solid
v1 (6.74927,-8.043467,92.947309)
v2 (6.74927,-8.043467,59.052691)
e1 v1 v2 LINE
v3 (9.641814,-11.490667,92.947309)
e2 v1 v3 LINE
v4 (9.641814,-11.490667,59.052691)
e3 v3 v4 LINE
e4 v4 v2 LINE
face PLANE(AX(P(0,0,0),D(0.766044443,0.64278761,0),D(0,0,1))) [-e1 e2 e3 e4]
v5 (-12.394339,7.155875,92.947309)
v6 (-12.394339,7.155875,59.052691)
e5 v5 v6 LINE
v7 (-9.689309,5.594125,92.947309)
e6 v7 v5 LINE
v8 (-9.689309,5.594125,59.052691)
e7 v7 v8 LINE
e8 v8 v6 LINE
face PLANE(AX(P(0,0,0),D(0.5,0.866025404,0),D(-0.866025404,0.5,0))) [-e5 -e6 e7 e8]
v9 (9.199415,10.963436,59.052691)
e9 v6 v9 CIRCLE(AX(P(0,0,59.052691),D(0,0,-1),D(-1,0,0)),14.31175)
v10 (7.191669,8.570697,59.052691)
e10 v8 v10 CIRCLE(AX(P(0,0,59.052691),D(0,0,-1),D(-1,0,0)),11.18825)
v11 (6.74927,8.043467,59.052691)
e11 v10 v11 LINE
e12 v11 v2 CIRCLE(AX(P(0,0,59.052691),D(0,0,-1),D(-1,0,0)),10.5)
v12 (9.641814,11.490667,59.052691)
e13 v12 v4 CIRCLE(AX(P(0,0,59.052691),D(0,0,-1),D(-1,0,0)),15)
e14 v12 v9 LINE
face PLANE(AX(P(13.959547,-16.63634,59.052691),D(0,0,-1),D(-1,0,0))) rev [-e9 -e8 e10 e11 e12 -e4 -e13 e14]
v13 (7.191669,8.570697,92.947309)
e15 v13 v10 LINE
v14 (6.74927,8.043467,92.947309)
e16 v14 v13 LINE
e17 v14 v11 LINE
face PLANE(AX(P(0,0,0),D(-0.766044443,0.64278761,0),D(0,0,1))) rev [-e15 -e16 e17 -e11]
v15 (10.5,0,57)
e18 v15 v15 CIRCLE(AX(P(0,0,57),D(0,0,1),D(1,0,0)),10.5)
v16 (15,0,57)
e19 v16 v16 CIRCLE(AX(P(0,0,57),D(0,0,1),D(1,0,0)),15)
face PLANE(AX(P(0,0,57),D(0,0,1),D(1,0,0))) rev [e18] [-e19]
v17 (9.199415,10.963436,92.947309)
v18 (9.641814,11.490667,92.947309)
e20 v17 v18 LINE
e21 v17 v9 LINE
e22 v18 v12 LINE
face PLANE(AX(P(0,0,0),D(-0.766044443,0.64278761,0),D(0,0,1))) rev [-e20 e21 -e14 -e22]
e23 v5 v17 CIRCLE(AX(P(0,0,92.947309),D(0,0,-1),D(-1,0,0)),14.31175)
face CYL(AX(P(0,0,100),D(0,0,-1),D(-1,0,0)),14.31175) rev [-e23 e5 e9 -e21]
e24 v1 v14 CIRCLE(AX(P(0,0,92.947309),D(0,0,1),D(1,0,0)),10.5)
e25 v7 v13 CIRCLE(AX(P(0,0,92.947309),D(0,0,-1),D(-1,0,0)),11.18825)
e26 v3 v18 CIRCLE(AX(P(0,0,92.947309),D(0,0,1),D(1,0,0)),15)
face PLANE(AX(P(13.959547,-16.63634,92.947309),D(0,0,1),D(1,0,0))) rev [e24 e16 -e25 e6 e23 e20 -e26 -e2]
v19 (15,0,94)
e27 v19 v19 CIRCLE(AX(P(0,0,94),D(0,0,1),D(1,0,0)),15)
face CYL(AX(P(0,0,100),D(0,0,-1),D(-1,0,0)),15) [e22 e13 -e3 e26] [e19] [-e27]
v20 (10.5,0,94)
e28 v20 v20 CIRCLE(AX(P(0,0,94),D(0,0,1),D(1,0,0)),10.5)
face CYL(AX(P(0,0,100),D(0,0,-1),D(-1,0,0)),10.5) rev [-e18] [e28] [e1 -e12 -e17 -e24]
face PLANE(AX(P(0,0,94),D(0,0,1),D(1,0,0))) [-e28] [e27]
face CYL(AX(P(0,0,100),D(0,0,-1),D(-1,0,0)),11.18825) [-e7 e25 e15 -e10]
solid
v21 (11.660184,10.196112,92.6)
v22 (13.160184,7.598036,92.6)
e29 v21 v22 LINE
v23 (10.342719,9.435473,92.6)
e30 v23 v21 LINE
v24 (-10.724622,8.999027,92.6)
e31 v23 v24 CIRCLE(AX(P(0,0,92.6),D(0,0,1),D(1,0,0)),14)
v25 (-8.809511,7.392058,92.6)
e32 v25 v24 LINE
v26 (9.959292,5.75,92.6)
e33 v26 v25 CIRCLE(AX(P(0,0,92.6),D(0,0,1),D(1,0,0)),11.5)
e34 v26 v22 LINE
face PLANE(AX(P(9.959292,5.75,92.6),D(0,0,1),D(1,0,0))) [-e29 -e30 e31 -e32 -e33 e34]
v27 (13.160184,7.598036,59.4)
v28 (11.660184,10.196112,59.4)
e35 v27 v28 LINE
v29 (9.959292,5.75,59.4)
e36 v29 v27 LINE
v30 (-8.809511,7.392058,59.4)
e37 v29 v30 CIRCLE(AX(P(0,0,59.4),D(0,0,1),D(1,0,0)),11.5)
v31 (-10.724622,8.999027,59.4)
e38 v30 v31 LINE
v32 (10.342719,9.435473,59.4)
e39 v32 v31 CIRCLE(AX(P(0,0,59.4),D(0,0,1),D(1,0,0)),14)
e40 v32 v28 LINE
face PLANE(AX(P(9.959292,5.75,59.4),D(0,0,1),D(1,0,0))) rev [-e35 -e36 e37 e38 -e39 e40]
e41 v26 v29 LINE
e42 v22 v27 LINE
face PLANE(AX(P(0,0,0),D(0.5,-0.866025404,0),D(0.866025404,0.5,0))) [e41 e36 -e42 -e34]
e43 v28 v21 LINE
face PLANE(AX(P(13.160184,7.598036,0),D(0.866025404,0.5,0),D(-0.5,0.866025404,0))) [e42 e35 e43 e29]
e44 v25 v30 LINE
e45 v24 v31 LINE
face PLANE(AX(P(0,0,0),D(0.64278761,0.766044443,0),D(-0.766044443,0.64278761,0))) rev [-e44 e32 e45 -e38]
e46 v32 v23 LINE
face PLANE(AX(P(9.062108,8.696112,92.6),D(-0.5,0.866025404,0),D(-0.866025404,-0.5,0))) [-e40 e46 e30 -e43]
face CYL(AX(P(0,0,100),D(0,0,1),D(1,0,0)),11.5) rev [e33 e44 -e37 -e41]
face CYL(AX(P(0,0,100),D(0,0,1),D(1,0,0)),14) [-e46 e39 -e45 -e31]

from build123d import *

# Parameters (mm, degrees)
ESQUISSE1_R                                   = 15
ESQUISSE1_R_2                                 = 10.5
BOSS_EXTRU_3_DEPTH                            = 100
ESQUISSE9_W                                   = 5
ESQUISSE9_H                                   = 2
ENL_VEMENT_START                              = 10
ENL_VEMENT_DE_MATI_RE_R_VOLUTION2_DEPTH       = 5
R_P_TITION_CIRCULAIRE1_COUNT                  = 4
ESQUISSE11_R                                  = 2
ESQUISSE12_W                                  = 4
ESQUISSE12_H                                  = 5
ESQUISSE13_W                                  = 3
ESQUISSE13_H                                  = 5
CONG_2_R                                      = 1
CONG_3_R                                      = 1
CONG_4_R                                      = 1
CONG_5_R                                      = 1
ENL_V_MAT_EXTRU_2_DEPTH                       = 103.824588457
ENL_V_MAT_EXTRU_2_DEPTH_BACK                  = 103.824588457
ESQUISSE16_R                                  = 1.75
ESQUISSE19_W                                  = 13.434398634
ESQUISSE19_H                                  = 33.894617108
ENL_VEMENT_DE_MATI_RE_R_VOLUTION4_ANGLE       = 50
ENL_VEMENT_DE_MATI_RE_R_VOLUTION4_OTHER_ANGLE = 50
ESQUISSE20_W                                  = 33.894617108
ESQUISSE20_H                                  = 2.5
ESQUISSE25_R                                  = 1.75
ENL_V_MAT_EXTRU_3_DEPTH                       = 103.824588457
BOSS_EXTRU_4_REACH                            = 65.719
ESQUISSE29_W                                  = 33.894617108
ESQUISSE29_H                                  = 3.1234995
ENL_VEMENT_DE_MATI_RE_R_VOLUTION7_ANGLE       = 100
ESQUISSE32_W                                  = 33.2
ESQUISSE32_H                                  = 2.5
R_VOLUTION4_ANGLE                             = 20
R_VOLUTION4_OTHER_WAY_ANGLE                   = 90
BOSS_EXTRU_5_DEPTH                            = 2
BOSS_EXTRU_5_DEPTH_BACK                       = 1
ESQUISSE34_W                                  = 3
ESQUISSE34_H                                  = 33.2
ESQUISSE35_R                                  = 19
BOSS_EXTRU_6_DEPTH                            = 10
ESQUISSE36_R                                  = 10
ESQUISSE36_R_2                                = 7.5
BOSS_EXTRU_7_DEPTH                            = 50
ESQUISSE39_R                                  = 5
BOSS_EXTRU_8_DEPTH                            = 21
ESQUISSE41_R                                  = 23.968073598
ENL_V_MAT_EXTRU_4_DEPTH                       = 57
ESQUISSE42_R                                  = 25.631074034
ENL_V_MAT_EXTRU_5_DEPTH                       = 66


# Read off the part's stored shape, not the designer's step: Enlèvement de matière-Révolution2
with BuildPart() as part:
    # Esquisse1 → Boss.-Extru.3 (new body)
    with BuildSketch(Plane.XY):
        Circle(ESQUISSE1_R)
        Circle(ESQUISSE1_R_2, mode=Mode.SUBTRACT)
    extrude(amount=BOSS_EXTRU_3_DEPTH)

    # Esquisse9 → Enlèvement de matière-Révolution1 (revolve, cut)
    with BuildSketch(Plane(origin=(0, 0, 0), x_dir=(0, 0, -1), z_dir=(1, 0, 0)), mode=Mode.PRIVATE) as enl_vement_de_mati_re_r_volution1_sk:
        with Locations((-7.5, -15)):
            Rectangle(ESQUISSE9_W, ESQUISSE9_H)
    revolve(enl_vement_de_mati_re_r_volution1_sk.sketch.rotate(Axis((0, 0, 100), (0, 0, -1)), 270), axis=Axis((0, 0, 100), (0, 0, -1)), mode=Mode.SUBTRACT)

    # Enlèvement de matière-Révolution2 outlin → Enlèvement de matière-Révolution2 (cut)
    with BuildSketch(Plane.XY.offset(ENL_VEMENT_START)):
        with BuildLine():
            Line((-2.431074487, -13.787308542), (-2.604722665, -14.772116295))
            ThreePointArc((-2.604722665, -14.772116295), (0, -15), (2.604722665, -14.772116295))
            Line((2.604722665, -14.772116295), (2.431074487, -13.787308542))
            ThreePointArc((2.431074487, -13.787308542), (0, -14), (-2.431074487, -13.787308542))
        make_face()
    enl_vement_de_mati_re_r_volution2 = extrude(amount=ENL_VEMENT_DE_MATI_RE_R_VOLUTION2_DEPTH, mode=Mode.SUBTRACT)

    # Répétition circulaire1: Enlèvement de matière-Révolution2 ×4 about axis
    r_p_tition_circulaire1_axis = Axis((0, 0, 0), (0, 0, 1))
    for i in range(1, R_P_TITION_CIRCULAIRE1_COUNT):
        add(enl_vement_de_mati_re_r_volution2.rotate(r_p_tition_circulaire1_axis, i * 360 / R_P_TITION_CIRCULAIRE1_COUNT), mode=Mode.SUBTRACT)

    # Esquisse11 → Enlèvement de matière-Révolution3 (revolve, cut)
    with BuildSketch(Plane(origin=(0, 0, 0), x_dir=(1, 0, 0), z_dir=(0, 1, 0)), mode=Mode.PRIVATE) as enl_vement_de_mati_re_r_volution3_sk:
        with Locations((15, -50)):
            Circle(ESQUISSE11_R)
    revolve(enl_vement_de_mati_re_r_volution3_sk.sketch.rotate(Axis((0, 0, 100), (0, 0, -1)), 190), axis=Axis((0, 0, 100), (0, 0, -1)), mode=Mode.SUBTRACT)

    # Esquisse12 → Révolution1 (revolve)
    with BuildSketch(Plane(origin=(0, 0, 0), x_dir=(1, 0, 0), z_dir=(0, 1, 0))):
        with Locations((14.924774562, -54.5)):
            Rectangle(ESQUISSE12_W, ESQUISSE12_H)
    revolve(axis=Axis((0, 0, 100), (0, 0, -1)))

    # Esquisse13 → Révolution2 (revolve)
    with BuildSketch(Plane(origin=(0, 0, 0), x_dir=(1, 0, 0), z_dir=(0, 1, 0)), mode=Mode.PRIVATE) as r_volution2_sk:
        with Locations((15, -97.5)):
            Rectangle(ESQUISSE13_W, ESQUISSE13_H)
    revolve(r_volution2_sk.sketch.rotate(Axis((0, 0, 100), (0, 0, -1)), 190), axis=Axis((0, 0, 100), (0, 0, -1)))

    # Congé2
    cong_2_edges = [part.edges().sort_by_distance(p)[0] for p in [
        (-16.924774562, 0, 52),
    ]]
    fillet(cong_2_edges, radius=CONG_2_R)

    # Congé3
    cong_3_edges = [part.edges().sort_by_distance(p)[0] for p in [
        (-16.924774562, 0, 57),
    ]]
    fillet(cong_3_edges, radius=CONG_3_R)

    # Congé4
    cong_4_edges = [part.edges().sort_by_distance(p)[0] for p in [
        (16.249327925, -2.865194932, 95),
        (16.249327925, -2.865194932, 100),
    ]]
    fillet(cong_4_edges, radius=CONG_4_R)

    # Congé5
    cong_5_edges = [part.edges().sort_by_distance(p)[0] for p in [
        (-1.307336141, -14.942920471, 48),
    ]]
    fillet(cong_5_edges, radius=CONG_5_R)

    # Esquisse16 → Enlèv. mat.-Extru.2 (cut, two sides: drawn at the far end of the back side and taken through both)
    with BuildSketch(Plane(origin=(0, 0, 0), x_dir=(0, 0, -1), z_dir=(1, 0, 0)).offset(-ENL_V_MAT_EXTRU_2_DEPTH_BACK)):
        with Locations((-12.5, 0)):
            Circle(ESQUISSE16_R)
    extrude(amount=ENL_V_MAT_EXTRU_2_DEPTH + ENL_V_MAT_EXTRU_2_DEPTH_BACK, mode=Mode.SUBTRACT)

    # Esquisse19 → Enlèvement de matière-Révolution4 (revolve, cut)
    with BuildSketch(Plane(origin=(0, 0, 0), x_dir=(1, 0, 0), z_dir=(0, 1, 0))):
        with Locations((15, -76)):
            Rectangle(ESQUISSE19_W, ESQUISSE19_H)
    revolve(axis=Axis((0, 0, 100), (0, 0, -1)), revolution_arc=ENL_VEMENT_DE_MATI_RE_R_VOLUTION4_ANGLE, mode=Mode.SUBTRACT)

    # Esquisse19 → Enlèvement de matière-Révolution4 other (revolve, cut)
    with BuildSketch(Plane(origin=(0, 0, 0), x_dir=(1, 0, 0), z_dir=(0, 1, 0))):
        with Locations((15, -76)):
            Rectangle(ESQUISSE19_W, ESQUISSE19_H)
    revolve(axis=Axis((0, 0, 100), (0, 0, 1)), revolution_arc=ENL_VEMENT_DE_MATI_RE_R_VOLUTION4_OTHER_ANGLE, mode=Mode.SUBTRACT)

    # Esquisse20 → Enlèvement de matière-Révolution5 (revolve, cut)
    with BuildSketch(Plane(origin=(0, 0, 0), x_dir=(0, 0, -1), z_dir=(0.7660444431189792, 0.642787609686538, 0)), mode=Mode.PRIVATE) as enl_vement_de_mati_re_r_volution5_sk:
        with Locations((-76, -10.5)):
            Rectangle(ESQUISSE20_W, ESQUISSE20_H)
    revolve(enl_vement_de_mati_re_r_volution5_sk.sketch.rotate(Axis((0, 0, 100), (0, 0, -1)), 140), axis=Axis((0, 0, 100), (0, 0, -1)), mode=Mode.SUBTRACT)

    # Esquisse25 → Enlèv. mat.-Extru.3 (cut, through all)
    with BuildSketch(Plane(origin=(0, 0, 0), x_dir=(0, 0, -1), z_dir=(1, 0, 0))):
        with Locations(Location((-97.5, 0, 0), (0, 0, 180))):
            Circle(ESQUISSE25_R)
        with Locations(Location((-54.5, 0, 0), (0, 0, 180))):
            Circle(ESQUISSE25_R)
    extrude(amount=ENL_V_MAT_EXTRU_3_DEPTH, mode=Mode.SUBTRACT)

    # Esquisse28 → Boss.-Extru.4 (add, up to next)
    with BuildSketch(Plane.XY.offset(59.052691446), mode=Mode.PRIVATE) as boss_extru_4_sk1:
        with BuildLine():
            Line((6.749269902, 8.043466653), (7.552754414, 9.001022207))
            ThreePointArc((7.552754414, 9.001022207), (-11.75, 0), (7.552754414, -9.001022207))
            Line((7.552754414, -9.001022207), (6.749269902, -8.043466653))
            ThreePointArc((6.749269902, -8.043466653), (-10.5, 0), (6.749269902, 8.043466653))
        make_face()
    boss_extru_4_tool1 = extrude(boss_extru_4_sk1.sketch, amount=BOSS_EXTRU_4_REACH, mode=Mode.PRIVATE) - part.part
    add(boss_extru_4_tool1.solids().sort_by_distance((-10.804113, 0, 59.052691))[0])

    # Esquisse29 → Enlèvement de matière-Révolution7 (revolve, cut)
    with BuildSketch(Plane(origin=(0, 0, 0), x_dir=(0, 0, -1), z_dir=(0.7660444431189792, -0.6427876096865379, 0))):
        with Locations((-76, 12.75)):
            Rectangle(ESQUISSE29_W, ESQUISSE29_H)
    revolve(axis=Axis((0, 0, 100), (0, 0, 1)), revolution_arc=ENL_VEMENT_DE_MATI_RE_R_VOLUTION7_ANGLE, mode=Mode.SUBTRACT)

    # Esquisse35 → Boss.-Extru.6 (add)
    with BuildSketch(Plane.XY.offset(100)):
        Circle(ESQUISSE35_R)
    extrude(amount=BOSS_EXTRU_6_DEPTH)

    # Esquisse36 → Boss.-Extru.7 (add)
    with BuildSketch(Plane.XY.offset(110)):
        Circle(ESQUISSE36_R)
        Circle(ESQUISSE36_R_2, mode=Mode.SUBTRACT)
    extrude(amount=BOSS_EXTRU_7_DEPTH)

    # Esquisse39 → Boss.-Extru.8 (add)
    with BuildSketch(Plane(origin=(0, 0, 0), x_dir=(0, 0, -1), z_dir=(1, 0, 0))):
        with Locations((-105, 0)):
            Circle(ESQUISSE39_R)
    extrude(amount=BOSS_EXTRU_8_DEPTH)

    # Esquisse40 → Enlèvement de matière-Révolution9 (revolve, cut)
    with BuildSketch(Plane(origin=(21, 0, 0), x_dir=(0, 0, -1), z_dir=(1, 0, 0))):
        with BuildLine():
            Line((-107.5, 0), (-102.5, 0))
            ThreePointArc((-102.5, 0), (-105, -2.5), (-107.5, 0))
        make_face()
    revolve(axis=Axis((21, 0, 107.5), (0, 0, -1)), mode=Mode.SUBTRACT)

    # Esquisse41 → Enlèv. mat.-Extru.4 (cut)
    with BuildSketch(Plane.XY):
        Circle(ESQUISSE41_R)
    extrude(amount=ENL_V_MAT_EXTRU_4_DEPTH, mode=Mode.SUBTRACT)

    # Esquisse42 → Enlèv. mat.-Extru.5 (cut)
    with BuildSketch(Plane.XY.offset(160)):
        Circle(ESQUISSE42_R)
    extrude(amount=-ENL_V_MAT_EXTRU_5_DEPTH, mode=Mode.SUBTRACT)


with BuildPart() as body_2:
    # Esquisse32 → Révolution4 (revolve)
    with BuildSketch(Plane(origin=(0, 0, 0), x_dir=(0, 0, -1), z_dir=(0.7660444431189792, -0.6427876096865379, 0))):
        with Locations((-76, 12.75)):
            Rectangle(ESQUISSE32_W, ESQUISSE32_H)
    revolve(axis=Axis((0, 0, 100), (0, 0, -1)), revolution_arc=R_VOLUTION4_ANGLE)

    # Esquisse32 → Révolution4 other way (revolve)
    with BuildSketch(Plane(origin=(0, 0, 0), x_dir=(0, 0, -1), z_dir=(0.7660444431189792, -0.6427876096865379, 0))):
        with Locations((-76, 12.75)):
            Rectangle(ESQUISSE32_W, ESQUISSE32_H)
    revolve(axis=Axis((0, 0, 100), (0, 0, 1)), revolution_arc=R_VOLUTION4_OTHER_WAY_ANGLE)

    # Esquisse34 → Boss.-Extru.5 (add, two sides: drawn at the far end of the back side and taken through both)
    with BuildSketch(Plane(origin=(11.428132998, 6.598035663, 0), x_dir=(-0.5000000000000011, 0.8660254037844382, -9.071134608832366e-15), z_dir=(0.8660254037844382, 0.5000000000000011, 1.7457406694215556e-15)).offset(-BOSS_EXTRU_5_DEPTH_BACK)):
        with Locations((1.5, 76)):
            Rectangle(ESQUISSE34_W, ESQUISSE34_H)
    extrude(amount=BOSS_EXTRU_5_DEPTH + BOSS_EXTRU_5_DEPTH_BACK)


solid = Compound([part.part, body_2.part])
